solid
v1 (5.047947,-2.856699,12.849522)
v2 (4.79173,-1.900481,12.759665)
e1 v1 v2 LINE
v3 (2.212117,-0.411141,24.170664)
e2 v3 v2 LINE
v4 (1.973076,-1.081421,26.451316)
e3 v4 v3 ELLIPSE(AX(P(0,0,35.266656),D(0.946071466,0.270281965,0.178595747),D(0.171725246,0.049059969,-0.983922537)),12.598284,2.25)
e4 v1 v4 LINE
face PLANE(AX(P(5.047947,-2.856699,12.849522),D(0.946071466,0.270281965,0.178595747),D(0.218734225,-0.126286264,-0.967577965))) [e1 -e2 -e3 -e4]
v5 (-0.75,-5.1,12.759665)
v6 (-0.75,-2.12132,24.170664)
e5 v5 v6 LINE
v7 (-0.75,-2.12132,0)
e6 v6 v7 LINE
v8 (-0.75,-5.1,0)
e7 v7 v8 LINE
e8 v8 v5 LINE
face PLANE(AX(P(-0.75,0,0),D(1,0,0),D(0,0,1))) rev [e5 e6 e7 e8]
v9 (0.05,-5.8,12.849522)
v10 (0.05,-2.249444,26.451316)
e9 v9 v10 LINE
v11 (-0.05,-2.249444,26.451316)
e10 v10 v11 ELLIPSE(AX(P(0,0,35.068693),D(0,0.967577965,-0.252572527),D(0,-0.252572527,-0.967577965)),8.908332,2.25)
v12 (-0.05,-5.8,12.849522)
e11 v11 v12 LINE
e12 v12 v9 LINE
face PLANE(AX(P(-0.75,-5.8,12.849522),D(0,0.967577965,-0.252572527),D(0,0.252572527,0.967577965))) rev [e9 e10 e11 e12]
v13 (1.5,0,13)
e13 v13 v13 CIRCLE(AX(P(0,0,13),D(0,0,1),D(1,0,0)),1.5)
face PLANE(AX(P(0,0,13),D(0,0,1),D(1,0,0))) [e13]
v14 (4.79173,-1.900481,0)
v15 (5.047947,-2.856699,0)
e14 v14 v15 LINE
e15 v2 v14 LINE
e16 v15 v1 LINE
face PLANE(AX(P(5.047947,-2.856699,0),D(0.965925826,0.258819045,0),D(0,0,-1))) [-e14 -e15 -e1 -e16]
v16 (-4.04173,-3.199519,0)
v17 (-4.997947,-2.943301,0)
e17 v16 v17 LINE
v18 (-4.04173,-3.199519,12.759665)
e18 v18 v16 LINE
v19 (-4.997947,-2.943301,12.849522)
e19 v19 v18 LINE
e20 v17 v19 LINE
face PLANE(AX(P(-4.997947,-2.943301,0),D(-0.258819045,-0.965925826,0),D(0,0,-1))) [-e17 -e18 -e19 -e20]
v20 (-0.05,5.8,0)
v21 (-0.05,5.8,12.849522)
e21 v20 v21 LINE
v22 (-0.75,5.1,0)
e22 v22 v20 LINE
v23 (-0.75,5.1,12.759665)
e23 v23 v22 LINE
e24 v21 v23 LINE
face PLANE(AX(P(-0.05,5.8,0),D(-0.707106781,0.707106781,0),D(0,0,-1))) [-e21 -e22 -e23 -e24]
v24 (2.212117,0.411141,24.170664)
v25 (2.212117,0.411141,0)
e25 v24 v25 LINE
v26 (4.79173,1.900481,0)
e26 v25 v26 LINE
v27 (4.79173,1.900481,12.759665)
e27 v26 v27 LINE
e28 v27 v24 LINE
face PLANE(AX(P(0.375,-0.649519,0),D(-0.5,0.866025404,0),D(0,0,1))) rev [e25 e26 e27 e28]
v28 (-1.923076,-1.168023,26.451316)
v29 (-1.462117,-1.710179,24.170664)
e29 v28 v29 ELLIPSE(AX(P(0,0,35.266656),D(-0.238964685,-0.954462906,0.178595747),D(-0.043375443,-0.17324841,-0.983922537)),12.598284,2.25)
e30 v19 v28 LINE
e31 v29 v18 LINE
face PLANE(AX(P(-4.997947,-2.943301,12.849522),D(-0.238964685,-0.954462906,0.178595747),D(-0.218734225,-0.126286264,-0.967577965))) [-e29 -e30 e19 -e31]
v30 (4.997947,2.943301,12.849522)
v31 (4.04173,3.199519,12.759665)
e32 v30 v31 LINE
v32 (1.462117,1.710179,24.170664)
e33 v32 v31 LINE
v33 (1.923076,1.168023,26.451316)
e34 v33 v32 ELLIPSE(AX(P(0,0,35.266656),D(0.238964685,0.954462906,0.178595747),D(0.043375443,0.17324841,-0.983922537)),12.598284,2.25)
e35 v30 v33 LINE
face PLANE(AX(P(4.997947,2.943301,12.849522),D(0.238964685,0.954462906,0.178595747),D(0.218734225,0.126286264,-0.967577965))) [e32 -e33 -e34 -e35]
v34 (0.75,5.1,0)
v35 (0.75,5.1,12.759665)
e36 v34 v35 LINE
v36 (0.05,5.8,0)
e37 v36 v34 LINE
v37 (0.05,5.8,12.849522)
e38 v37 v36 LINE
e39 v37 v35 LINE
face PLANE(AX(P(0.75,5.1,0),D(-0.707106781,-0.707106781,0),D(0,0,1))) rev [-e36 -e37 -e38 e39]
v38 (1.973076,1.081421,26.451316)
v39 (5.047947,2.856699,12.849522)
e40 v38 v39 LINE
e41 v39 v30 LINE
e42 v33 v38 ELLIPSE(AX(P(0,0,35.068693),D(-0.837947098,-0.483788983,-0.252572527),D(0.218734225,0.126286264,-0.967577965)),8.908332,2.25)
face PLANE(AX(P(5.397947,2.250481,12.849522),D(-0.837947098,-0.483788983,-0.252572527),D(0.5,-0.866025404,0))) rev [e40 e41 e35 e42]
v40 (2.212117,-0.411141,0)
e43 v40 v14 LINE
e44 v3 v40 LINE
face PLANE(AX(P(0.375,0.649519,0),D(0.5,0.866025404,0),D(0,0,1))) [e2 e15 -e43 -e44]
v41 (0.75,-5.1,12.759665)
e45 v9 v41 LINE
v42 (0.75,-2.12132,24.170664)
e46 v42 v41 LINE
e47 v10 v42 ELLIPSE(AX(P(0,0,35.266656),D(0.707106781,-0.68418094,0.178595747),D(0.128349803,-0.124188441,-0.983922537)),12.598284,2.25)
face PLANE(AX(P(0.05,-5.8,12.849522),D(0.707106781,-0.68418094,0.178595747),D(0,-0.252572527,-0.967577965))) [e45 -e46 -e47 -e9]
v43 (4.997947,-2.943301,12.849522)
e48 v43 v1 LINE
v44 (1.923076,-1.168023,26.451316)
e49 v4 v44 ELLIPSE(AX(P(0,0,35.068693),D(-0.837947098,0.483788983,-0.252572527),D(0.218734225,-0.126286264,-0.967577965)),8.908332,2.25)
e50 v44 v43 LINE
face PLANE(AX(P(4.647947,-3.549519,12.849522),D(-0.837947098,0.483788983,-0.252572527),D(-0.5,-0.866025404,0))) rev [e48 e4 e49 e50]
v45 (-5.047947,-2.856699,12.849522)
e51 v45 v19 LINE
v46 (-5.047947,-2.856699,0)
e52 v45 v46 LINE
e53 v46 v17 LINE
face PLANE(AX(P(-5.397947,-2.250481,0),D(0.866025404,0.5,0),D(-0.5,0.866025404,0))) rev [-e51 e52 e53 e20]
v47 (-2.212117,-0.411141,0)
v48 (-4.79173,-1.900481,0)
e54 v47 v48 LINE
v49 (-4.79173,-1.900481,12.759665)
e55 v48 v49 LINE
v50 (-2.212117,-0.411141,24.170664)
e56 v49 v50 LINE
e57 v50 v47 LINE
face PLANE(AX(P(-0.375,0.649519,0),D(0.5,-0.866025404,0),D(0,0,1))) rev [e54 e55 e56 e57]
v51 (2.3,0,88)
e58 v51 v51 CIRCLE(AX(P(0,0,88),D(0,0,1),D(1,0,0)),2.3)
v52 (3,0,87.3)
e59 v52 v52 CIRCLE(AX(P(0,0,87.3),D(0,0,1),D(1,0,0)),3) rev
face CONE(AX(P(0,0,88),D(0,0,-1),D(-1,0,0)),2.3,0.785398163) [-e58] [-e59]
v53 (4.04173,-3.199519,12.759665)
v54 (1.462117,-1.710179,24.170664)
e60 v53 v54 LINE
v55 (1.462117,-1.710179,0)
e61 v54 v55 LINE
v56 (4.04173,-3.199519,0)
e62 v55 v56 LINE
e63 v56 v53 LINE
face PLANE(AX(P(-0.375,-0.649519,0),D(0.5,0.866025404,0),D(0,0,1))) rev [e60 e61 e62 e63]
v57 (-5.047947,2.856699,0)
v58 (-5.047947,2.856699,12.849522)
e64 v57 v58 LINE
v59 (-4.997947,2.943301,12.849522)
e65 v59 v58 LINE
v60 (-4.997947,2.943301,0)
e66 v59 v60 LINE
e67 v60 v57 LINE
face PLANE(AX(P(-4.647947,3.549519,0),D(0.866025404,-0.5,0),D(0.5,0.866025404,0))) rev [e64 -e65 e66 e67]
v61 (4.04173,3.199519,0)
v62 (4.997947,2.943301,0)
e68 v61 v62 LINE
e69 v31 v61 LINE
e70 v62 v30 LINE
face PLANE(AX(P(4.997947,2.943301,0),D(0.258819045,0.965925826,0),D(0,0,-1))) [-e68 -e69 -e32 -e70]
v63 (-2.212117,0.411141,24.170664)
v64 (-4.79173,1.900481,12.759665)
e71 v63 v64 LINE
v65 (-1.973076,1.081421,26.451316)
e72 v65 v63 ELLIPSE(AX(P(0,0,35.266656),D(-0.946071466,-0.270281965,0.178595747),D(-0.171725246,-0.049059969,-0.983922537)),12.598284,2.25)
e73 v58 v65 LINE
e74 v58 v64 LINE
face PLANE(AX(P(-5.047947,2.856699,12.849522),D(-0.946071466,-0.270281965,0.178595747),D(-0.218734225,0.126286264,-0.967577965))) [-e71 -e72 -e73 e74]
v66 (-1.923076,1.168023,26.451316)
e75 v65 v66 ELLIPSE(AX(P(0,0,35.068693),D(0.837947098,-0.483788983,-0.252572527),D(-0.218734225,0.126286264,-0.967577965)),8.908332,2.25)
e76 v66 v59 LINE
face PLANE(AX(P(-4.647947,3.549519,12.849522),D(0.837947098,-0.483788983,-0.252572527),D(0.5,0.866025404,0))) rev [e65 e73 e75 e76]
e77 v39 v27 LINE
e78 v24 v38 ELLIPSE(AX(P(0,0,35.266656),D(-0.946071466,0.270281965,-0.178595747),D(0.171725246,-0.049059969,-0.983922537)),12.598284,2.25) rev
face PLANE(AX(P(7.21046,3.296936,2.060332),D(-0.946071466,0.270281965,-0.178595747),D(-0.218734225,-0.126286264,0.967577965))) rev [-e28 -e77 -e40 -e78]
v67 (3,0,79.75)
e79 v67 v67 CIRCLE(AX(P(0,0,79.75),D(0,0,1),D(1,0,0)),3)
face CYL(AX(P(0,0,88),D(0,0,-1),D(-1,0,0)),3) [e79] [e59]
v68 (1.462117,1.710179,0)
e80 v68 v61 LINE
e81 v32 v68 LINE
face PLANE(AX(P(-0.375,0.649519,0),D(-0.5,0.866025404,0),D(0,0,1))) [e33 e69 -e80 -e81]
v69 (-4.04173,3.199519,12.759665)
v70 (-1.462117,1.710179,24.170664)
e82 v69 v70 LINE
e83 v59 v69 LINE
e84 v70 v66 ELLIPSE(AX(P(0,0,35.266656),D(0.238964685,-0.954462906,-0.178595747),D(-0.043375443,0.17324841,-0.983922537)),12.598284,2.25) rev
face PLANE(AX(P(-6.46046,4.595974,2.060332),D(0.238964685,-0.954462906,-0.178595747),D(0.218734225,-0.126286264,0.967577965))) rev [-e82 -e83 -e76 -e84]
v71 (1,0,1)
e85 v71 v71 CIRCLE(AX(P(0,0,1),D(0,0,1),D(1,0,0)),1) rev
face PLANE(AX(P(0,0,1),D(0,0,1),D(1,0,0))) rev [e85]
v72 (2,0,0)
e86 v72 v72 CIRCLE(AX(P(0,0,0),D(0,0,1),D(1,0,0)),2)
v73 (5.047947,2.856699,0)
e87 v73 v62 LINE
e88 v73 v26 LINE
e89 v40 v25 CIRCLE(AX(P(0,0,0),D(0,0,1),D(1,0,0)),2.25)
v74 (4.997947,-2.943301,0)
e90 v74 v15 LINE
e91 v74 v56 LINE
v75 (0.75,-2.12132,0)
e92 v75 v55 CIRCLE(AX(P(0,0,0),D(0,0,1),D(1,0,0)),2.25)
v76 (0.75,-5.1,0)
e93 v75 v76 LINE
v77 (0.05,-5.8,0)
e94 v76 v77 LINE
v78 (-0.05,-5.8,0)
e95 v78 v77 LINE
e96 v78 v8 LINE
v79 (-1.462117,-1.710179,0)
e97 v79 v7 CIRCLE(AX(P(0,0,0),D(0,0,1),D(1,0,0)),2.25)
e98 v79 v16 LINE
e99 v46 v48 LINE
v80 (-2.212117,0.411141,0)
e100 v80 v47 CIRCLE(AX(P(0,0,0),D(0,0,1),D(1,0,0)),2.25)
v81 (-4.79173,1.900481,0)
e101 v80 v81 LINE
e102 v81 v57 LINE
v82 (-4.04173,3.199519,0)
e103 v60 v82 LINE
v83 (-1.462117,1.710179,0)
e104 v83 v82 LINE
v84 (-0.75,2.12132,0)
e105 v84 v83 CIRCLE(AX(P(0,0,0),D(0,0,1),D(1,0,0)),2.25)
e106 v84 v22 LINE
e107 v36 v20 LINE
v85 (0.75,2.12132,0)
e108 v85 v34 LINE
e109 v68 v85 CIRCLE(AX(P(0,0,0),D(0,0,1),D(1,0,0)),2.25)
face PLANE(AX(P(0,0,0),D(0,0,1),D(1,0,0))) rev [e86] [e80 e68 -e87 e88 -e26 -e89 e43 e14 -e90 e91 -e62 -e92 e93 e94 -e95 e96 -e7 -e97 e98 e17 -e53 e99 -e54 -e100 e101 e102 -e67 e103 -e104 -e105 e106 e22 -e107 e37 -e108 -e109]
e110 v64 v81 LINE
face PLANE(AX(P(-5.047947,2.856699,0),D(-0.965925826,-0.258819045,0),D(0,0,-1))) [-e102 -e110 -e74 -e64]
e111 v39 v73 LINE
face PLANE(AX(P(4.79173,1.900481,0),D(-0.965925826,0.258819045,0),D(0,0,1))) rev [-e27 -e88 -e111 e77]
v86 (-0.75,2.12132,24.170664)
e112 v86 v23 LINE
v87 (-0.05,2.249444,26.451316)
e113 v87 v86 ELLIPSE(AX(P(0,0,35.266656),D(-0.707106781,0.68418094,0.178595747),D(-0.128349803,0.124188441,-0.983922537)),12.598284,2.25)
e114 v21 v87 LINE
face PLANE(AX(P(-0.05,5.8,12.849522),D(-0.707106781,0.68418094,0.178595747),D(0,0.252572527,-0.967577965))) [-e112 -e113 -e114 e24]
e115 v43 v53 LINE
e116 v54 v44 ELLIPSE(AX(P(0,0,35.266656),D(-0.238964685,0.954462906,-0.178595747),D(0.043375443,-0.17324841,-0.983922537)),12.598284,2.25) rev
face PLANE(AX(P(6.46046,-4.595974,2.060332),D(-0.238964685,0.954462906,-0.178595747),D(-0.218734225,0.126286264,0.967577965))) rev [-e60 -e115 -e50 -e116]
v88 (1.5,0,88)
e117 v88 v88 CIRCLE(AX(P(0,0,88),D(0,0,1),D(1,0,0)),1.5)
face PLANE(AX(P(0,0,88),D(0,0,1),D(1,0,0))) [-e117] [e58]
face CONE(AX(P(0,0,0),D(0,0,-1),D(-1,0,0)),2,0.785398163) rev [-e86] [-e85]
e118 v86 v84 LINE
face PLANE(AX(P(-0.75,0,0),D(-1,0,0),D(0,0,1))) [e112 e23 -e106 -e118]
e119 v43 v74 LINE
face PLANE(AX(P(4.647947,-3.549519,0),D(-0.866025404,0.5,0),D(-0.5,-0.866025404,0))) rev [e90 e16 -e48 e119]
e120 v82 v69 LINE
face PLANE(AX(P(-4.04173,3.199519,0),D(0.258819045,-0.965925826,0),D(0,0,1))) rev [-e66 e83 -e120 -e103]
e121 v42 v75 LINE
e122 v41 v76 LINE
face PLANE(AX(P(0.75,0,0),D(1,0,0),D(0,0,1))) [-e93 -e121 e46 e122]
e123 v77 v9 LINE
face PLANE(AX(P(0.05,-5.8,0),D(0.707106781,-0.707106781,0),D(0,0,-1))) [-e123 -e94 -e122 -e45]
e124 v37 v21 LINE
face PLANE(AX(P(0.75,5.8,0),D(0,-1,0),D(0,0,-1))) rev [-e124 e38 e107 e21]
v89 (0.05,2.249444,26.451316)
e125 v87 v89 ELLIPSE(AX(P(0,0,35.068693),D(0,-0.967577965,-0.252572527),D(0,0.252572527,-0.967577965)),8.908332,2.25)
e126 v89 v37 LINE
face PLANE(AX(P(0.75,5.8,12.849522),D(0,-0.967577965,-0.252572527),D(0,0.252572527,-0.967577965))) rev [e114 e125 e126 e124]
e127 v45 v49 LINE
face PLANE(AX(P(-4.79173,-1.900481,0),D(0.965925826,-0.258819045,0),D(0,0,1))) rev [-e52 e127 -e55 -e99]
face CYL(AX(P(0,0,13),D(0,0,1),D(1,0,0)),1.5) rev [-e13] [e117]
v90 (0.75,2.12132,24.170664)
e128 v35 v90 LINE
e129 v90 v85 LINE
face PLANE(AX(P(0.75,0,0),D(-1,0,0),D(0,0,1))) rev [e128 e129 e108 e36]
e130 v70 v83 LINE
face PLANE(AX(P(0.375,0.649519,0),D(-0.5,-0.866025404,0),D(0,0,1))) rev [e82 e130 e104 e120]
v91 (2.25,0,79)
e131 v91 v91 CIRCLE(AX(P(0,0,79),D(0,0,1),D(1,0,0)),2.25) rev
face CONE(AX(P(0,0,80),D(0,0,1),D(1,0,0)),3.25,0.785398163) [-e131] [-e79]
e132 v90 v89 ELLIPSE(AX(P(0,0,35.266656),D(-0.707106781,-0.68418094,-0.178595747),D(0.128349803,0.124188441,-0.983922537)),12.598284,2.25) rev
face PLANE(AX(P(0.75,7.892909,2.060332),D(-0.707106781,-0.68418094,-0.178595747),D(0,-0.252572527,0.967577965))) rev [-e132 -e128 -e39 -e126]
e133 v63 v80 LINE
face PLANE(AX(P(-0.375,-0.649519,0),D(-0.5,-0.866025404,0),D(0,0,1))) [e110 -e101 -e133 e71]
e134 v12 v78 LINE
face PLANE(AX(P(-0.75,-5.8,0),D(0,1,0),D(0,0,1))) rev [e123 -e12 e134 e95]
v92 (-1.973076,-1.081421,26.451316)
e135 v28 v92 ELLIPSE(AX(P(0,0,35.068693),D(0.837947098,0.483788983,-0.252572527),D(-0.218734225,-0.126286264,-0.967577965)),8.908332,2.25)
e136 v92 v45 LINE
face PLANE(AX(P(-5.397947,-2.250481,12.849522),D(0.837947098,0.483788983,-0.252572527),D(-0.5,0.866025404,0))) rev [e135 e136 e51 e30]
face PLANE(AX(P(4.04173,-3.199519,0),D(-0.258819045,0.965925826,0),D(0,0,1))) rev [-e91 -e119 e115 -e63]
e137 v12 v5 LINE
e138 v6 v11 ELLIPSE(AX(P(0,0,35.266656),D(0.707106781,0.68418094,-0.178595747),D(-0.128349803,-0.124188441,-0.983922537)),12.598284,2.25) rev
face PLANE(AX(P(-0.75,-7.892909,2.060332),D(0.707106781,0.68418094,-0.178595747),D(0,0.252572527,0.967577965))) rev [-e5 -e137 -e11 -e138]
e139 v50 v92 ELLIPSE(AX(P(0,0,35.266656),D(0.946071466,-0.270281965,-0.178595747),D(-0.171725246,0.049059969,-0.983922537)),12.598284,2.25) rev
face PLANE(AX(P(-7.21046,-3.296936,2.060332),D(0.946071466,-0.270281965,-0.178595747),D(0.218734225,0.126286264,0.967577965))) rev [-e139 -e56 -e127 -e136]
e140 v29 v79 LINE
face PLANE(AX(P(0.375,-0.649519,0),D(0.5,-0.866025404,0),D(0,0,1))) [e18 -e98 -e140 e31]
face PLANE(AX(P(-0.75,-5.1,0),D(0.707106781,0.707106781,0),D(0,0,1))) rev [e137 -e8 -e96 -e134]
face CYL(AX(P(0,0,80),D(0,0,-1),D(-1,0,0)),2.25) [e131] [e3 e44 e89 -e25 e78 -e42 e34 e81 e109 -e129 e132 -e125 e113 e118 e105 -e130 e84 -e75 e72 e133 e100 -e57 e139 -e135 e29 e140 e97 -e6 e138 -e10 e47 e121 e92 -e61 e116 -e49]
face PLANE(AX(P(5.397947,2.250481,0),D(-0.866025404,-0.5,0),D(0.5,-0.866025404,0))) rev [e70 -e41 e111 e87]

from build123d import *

# Parameters (mm, degrees)
SKETCH_1_R                           = 2.25
EXTRUDE_1_DEPTH                      = 80
EXTRUDE_3_DEPTH                      = 0.75
CHAMFER_4_SIZE                       = 0.7
PATTERN_CIRCULAR_1_COUNT             = 6
CHAMFER_4_OF_PATTERN_CIRCULAR_1_SIZE = 0.7
SKETCH_7_R                           = 3
EXTRUDE_4_DEPTH                      = 8
CHAMFER_6_SIZE                       = 1
CHAMFER_7_SIZE                       = 0.7
SKETCH_8_R                           = 1.5
CUT_EXTRUDE_3_DEPTH                  = 75
SKETCH_9_R                           = 2
CUT_EXTRUDE_4_DEPTH                  = 1
CHAMFER_8_SIZE                       = 1


# Some blends are built 0.0001 mm under size
with BuildPart() as part:
    # 스케치1 → 보스-돌출1 (new body)
    with BuildSketch(Plane.XY):
        Circle(SKETCH_1_R)
    extrude(amount=EXTRUDE_1_DEPTH)

    # 스케치5 → 보스-돌출3 (add, symmetric)
    with BuildSketch(Plane(origin=(0, 0, 0), x_dir=(0, 0, -1), z_dir=(1, 0, 0))):
        Polygon((0, 1.323110618), (0, 5.8), (-12.84952222, 5.8), (-30, 1.323110618), align=None)
    extrude_3 = extrude(amount=EXTRUDE_3_DEPTH, both=True)

    # 모따기4
    chamfer_4_edges = [part.edges().sort_by_distance(p)[0] for p in [
        (-0.75, 3.960660172, 19.895833657),
        (-0.75, 5.8, 6.42476111),
        (0.75, 5.8, 6.42476111),
        (0.75, 3.960660172, 19.895833657),
    ]]
    chamfer(chamfer_4_edges, length=CHAMFER_4_SIZE)

    # 원형 패턴1: 보스-돌출3 ×6 about axis
    pattern_circular_1_axis = Axis((0, 0, 0), (0, 0, 1))
    for i in range(1, PATTERN_CIRCULAR_1_COUNT):
        add(extrude_3.rotate(pattern_circular_1_axis, i * 360 / PATTERN_CIRCULAR_1_COUNT))

    # 모따기4 of 원형 패턴1
    chamfer_4_of_pattern_circular_1_edges = [part.edges().sort_by_distance(p)[0] for p in [
        (-3.805032325, 1.330811033, 19.895833657),
        (-5.397947342, 2.250480947, 6.42476111),
        (-4.647947342, 3.549519053, 6.42476111),
        (-3.055032325, 2.629849139, 19.895833657),
        (-3.055032325, -2.629849139, 19.895833657),
        (-4.647947342, -3.549519053, 6.42476111),
        (-5.397947342, -2.250480947, 6.42476111),
        (-3.805032325, -1.330811033, 19.895833657),
        (0.75, -3.960660172, 19.895833657),
        (0.75, -5.8, 6.42476111),
        (-0.75, -5.8, 6.42476111),
        (-0.75, -3.960660172, 19.895833657),
        (3.805032325, -1.330811033, 19.895833657),
        (5.397947342, -2.250480947, 6.42476111),
        (4.647947342, -3.549519053, 6.42476111),
        (3.055032325, -2.629849139, 19.895833657),
        (3.055032325, 2.629849139, 19.895833657),
        (4.647947342, 3.549519053, 6.42476111),
        (5.397947342, 2.250480947, 6.42476111),
        (3.805032325, 1.330811033, 19.895833657),
    ]]
    chamfer(chamfer_4_of_pattern_circular_1_edges, length=CHAMFER_4_OF_PATTERN_CIRCULAR_1_SIZE)

    # 스케치7 → 보스-돌출4 (add)
    with BuildSketch(Plane.XY.offset(80)):
        Circle(SKETCH_7_R)
    extrude(amount=EXTRUDE_4_DEPTH)

    # 모따기6
    # the kernel refuses this chamfer: 1 mm, written as the material it adds along each edge
    with BuildSketch(Plane(origin=(0, 0, 80), x_dir=(1, 0, 0), z_dir=(0, -1, 0))) as chamfer_6_piece_1_section:
        Polygon((2.25 + CHAMFER_6_SIZE, 0), (2.25, -CHAMFER_6_SIZE), (2.25, 0), align=None)
    chamfer_6_piece_1 = revolve(axis=Axis((0, 0, 80), (0, 0, 1)), mode=Mode.PRIVATE)
    chamfer_6_piece_1 = chamfer_6_piece_1 & Plane(origin=(0, 0, 79.375065252), x_dir=(1, 0, 0), z_dir=(0, 0, -1)) * Cylinder(3, 13, mode=Mode.PRIVATE)
    add(chamfer_6_piece_1)

    # 모따기7
    chamfer_7_edges = [part.edges().sort_by_distance(p)[0] for p in [
        (-3, 0, 88),
    ]]
    chamfer(chamfer_7_edges, length=CHAMFER_7_SIZE)

    # 스케치8 → 컷-돌출3 (cut)
    with BuildSketch(Plane.XY.offset(88)):
        Circle(SKETCH_8_R)
    extrude(amount=-CUT_EXTRUDE_3_DEPTH, mode=Mode.SUBTRACT)

    # 스케치9 → 컷-돌출4 (cut)
    with BuildSketch(Plane.XY):
        Circle(SKETCH_9_R)
    extrude(amount=CUT_EXTRUDE_4_DEPTH, mode=Mode.SUBTRACT)

    # 모따기8
    chamfer_8_edges = [part.edges().sort_by_distance(p)[0] for p in [
        (-2, 0, 1),
    ]]
    chamfer(chamfer_8_edges, length=CHAMFER_8_SIZE - 0.0001)  # a hair under: the kernel refuses the full size


solid = part.part
